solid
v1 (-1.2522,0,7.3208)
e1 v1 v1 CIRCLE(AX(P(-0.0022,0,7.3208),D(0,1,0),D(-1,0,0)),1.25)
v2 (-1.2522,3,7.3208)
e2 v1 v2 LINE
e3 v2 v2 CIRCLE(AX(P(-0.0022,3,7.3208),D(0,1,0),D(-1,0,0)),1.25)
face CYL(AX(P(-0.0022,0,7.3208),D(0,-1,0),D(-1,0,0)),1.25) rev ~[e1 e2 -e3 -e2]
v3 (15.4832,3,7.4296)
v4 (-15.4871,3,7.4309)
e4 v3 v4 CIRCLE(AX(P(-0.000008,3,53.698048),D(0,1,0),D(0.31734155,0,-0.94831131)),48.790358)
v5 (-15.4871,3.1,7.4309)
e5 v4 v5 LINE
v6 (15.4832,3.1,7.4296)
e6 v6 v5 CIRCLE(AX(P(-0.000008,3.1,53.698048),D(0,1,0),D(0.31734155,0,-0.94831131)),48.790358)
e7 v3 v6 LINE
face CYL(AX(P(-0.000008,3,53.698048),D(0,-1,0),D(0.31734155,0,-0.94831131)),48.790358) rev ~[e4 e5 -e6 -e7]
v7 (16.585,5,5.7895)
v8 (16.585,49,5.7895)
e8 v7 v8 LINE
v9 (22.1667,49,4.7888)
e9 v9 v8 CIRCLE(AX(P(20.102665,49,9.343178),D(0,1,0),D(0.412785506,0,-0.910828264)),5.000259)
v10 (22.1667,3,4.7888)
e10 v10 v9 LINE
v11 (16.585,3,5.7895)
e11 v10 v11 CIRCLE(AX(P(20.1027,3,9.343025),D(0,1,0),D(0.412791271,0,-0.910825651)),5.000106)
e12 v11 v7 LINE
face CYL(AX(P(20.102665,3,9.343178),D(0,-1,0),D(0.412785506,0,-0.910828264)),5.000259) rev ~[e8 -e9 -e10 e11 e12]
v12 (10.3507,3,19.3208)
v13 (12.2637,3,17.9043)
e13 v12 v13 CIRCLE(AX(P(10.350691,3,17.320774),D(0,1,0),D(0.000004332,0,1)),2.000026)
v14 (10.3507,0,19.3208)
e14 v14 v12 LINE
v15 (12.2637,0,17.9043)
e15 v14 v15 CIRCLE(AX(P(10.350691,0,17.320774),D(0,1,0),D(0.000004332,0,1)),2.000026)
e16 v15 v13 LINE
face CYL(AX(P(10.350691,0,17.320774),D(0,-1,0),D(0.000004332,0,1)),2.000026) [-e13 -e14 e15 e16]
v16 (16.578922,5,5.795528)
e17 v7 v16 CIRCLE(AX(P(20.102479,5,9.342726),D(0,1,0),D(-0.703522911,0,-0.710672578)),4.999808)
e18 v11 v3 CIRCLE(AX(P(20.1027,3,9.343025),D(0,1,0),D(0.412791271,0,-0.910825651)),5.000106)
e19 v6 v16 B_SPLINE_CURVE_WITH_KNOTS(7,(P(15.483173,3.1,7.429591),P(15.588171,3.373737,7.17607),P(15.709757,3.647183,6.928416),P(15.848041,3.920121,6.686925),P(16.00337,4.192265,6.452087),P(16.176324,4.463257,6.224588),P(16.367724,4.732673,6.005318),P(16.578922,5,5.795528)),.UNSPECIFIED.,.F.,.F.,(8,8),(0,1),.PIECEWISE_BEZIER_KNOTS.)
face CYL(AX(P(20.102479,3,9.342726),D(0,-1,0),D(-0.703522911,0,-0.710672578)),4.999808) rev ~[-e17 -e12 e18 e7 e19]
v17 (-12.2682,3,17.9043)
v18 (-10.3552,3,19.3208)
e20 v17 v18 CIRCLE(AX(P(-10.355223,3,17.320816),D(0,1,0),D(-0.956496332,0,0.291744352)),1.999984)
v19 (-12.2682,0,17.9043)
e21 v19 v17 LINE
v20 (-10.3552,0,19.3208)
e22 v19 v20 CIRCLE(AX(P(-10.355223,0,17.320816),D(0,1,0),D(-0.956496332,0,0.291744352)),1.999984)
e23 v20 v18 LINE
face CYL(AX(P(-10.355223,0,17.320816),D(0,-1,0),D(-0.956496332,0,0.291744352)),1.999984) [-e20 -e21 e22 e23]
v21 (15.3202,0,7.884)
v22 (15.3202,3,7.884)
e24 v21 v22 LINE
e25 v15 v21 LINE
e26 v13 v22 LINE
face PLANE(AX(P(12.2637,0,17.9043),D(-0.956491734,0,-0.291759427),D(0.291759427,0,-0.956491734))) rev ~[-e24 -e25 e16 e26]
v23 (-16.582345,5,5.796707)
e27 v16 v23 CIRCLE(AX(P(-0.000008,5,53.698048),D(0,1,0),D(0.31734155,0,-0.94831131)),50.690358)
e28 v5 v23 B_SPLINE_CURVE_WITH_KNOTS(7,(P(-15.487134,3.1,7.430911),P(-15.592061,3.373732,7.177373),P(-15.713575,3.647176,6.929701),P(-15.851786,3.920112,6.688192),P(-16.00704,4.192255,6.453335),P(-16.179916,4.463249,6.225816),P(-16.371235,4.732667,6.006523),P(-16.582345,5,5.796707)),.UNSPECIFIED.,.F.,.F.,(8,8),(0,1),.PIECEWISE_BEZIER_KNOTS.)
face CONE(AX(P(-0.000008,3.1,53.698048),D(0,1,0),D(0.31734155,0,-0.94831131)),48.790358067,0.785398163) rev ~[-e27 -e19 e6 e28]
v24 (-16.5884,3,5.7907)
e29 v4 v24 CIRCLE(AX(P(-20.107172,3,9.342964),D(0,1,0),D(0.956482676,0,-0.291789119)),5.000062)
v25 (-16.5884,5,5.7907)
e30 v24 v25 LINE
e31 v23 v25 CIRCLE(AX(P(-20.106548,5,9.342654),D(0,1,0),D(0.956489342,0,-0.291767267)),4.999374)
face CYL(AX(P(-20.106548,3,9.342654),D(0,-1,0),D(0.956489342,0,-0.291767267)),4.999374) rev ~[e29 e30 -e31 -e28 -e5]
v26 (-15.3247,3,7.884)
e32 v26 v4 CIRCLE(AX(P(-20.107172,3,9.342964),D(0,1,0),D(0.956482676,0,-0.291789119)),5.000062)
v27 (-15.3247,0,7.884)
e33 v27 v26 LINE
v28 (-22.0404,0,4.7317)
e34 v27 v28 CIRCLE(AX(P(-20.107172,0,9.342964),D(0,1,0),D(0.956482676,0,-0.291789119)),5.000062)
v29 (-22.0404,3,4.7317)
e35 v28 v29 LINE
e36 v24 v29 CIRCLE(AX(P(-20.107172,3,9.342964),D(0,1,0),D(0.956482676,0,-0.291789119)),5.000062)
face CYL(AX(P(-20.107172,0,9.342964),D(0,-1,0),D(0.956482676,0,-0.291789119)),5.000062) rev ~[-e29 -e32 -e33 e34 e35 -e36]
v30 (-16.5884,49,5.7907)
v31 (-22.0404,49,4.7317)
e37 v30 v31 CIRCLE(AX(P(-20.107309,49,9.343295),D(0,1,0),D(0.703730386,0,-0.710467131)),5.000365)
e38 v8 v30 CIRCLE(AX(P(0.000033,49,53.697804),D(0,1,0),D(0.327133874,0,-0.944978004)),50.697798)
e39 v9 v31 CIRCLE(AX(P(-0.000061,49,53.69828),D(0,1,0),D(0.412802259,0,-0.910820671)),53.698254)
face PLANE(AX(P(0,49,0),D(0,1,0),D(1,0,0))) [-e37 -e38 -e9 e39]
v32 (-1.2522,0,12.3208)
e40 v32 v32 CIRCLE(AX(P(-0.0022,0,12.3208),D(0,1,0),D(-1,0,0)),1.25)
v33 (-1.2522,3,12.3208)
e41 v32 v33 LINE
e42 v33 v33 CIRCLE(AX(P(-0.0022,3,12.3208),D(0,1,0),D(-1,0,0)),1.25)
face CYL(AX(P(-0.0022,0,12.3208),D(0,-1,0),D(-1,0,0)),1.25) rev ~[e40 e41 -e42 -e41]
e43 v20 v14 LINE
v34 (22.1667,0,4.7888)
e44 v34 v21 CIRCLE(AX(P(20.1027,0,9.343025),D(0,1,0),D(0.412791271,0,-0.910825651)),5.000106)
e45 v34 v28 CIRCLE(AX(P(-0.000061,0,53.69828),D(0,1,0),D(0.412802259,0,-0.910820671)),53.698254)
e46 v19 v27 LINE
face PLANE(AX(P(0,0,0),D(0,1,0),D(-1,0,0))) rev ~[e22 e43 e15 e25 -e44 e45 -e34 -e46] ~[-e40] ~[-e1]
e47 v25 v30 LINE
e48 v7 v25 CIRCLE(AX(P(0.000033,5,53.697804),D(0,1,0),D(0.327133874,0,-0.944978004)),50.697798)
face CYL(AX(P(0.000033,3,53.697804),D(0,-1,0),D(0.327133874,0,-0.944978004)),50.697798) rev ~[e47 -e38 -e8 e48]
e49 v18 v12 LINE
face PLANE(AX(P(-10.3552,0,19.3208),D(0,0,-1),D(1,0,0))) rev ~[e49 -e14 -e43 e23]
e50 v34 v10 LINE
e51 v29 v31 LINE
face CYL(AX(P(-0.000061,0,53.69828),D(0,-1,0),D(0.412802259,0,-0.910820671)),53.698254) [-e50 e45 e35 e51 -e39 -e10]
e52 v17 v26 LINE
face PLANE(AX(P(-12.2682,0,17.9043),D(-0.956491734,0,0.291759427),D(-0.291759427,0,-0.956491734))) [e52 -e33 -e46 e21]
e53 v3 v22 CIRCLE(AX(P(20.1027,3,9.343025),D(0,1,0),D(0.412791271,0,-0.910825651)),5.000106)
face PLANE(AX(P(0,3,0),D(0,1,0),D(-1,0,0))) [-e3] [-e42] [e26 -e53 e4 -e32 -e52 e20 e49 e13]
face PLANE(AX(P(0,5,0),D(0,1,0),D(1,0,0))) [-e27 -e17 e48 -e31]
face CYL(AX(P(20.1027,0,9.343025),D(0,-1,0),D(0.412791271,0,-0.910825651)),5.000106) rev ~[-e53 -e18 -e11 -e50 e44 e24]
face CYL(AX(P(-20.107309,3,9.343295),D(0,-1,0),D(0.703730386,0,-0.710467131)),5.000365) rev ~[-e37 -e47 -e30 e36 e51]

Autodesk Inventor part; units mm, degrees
ref_plane "YZ Plane" through (0, 0, 0) normal (1, 0, 0) x (0, 1, 0)
ref_plane "XZ Plane" through (0, 0, 0) normal (0, 1, 0) x (-1, 0, 0)
ref_plane "XY Plane" through (0, 0, 0) normal (0, 0, 1) x (1, 0, 0)
sketch "Sketch1" plane through (0, 0, 0) normal (0, 1, 0) x (-1, 0, 0)
  line L0 (12.2682, 17.9043) -> (15.3247, 7.884)
  arc A0 (15.3247, 7.884) -> (22.1712, 4.7888) centre (20.1071, 9.3429) ccw
  arc A1 (-22.1667, 4.7888) -> (-15.3202, 7.884) centre (-20.1027, 9.3429) ccw
  line L1 (-12.2637, 17.9043) -> (-15.3202, 7.884)
  line L2 (10.3552, 19.3208) -> (-10.3507, 19.3208)
  arc A2 (12.2682, 17.9043) -> (10.3552, 19.3208) centre (10.3552, 17.3208) ccw
  arc A3 (-10.3507, 19.3208) -> (-12.2637, 17.9043) centre (-10.3507, 17.3208) ccw
  circle A4 centre (0.0022, 7.3208) radius 1.25
  circle A5 centre (0.0022, 12.3208) radius 1.25
  arc A6 (-22.1667, 4.7888) -> (22.0404, 4.7317) centre (0, 53.698) ccw
  point P0 (0, 0)
  point P1 (28.8757, 53.55)
  point P2 (16.8979, 2.7266)
  point P3 (-28.8757, 53.55)
  point P4 (-16.8934, 2.7266)
  point P5 (-37.9702, 69.5664)
  point P6 (0, 0)
  dimension "d0" = 5
  dimension "d1" = 2
  dimension "d2" = 2.5
  dimension "d3" = 2.5
  dimension "d4" = 34.3772
  dimension "d5" = 1.2868
  dimension "d6" = 1.2911
  dimension "d7" = 5
  dimension "d8" = 7
  dimension "d9" = 20.7059
  dimension "d10" = 10.0203
  dimension "d11" = 10.0203
  dimension "d12" = 13.3613
  dimension "d13" = 14.8201
  dimension "d14" = 53.698
  dimension "d15" = 7.3208
extrude "Extrusion1" add sketch "Sketch1" along normal blind 3
sketch "Sketch2" plane through (0, 3, 0) normal (0, 1, 0) x (1, 0, 0)
  arc A0 (22.1667, -4.7888) -> (16.585, -5.7895) centre (20.1027, -9.3429) ccw
  arc A1 (22.1667, -4.7888) -> (-22.0404, -4.7317) centre (0, -53.698) ccw
  arc A2 (-16.5884, -5.7907) -> (-22.0404, -4.7317) centre (-20.1071, -9.3429) ccw
  line L0 (9.3019, -15.6178) -> (9.24, -15.8208)
  line L1 (-9.2445, -15.8208) -> (-9.3064, -15.6178)
  line L2 (9.24, -15.8208) -> (9.0278, -15.8208)
  line L3 (-9.0323, -15.8208) -> (-9.2445, -15.8208)
  arc A3 (16.585, -5.7895) -> (-16.5884, -5.7907) centre (0, -53.698) ccw
  point P0 (0, 0)
  dimension "d21" = 3
extrude "Extrusion2" add sketch "Sketch2" along normal blind 46
sketch "Sketch3" plane through (0, 3, 0) normal (0, 1, 0) x (1, 0, 0)
  arc A0 (16.585, -5.7895) -> (-16.5884, -5.7907) centre (0, -53.698) ccw projected
  arc A1 (15.4832, -7.4296) -> (-15.4871, -7.4309) centre (0, -53.698) ccw
  arc A2 (16.585, -5.7895) -> (15.3202, -7.884) centre (20.1027, -9.3429) ccw projected
  arc A3 (-15.3247, -7.884) -> (-16.5884, -5.7907) centre (-20.1071, -9.3429) ccw projected
  point P0 (0, 0)
  dimension "d22" = 1.9077
extrude "Extrusion3" add sketch "Sketch3" along normal blind 2
chamfer "Chamfer1" distance 1.9 angle 45 1 edges at (-0.0021, 5, 4.9077)
properties part number "UVTRONwall"
